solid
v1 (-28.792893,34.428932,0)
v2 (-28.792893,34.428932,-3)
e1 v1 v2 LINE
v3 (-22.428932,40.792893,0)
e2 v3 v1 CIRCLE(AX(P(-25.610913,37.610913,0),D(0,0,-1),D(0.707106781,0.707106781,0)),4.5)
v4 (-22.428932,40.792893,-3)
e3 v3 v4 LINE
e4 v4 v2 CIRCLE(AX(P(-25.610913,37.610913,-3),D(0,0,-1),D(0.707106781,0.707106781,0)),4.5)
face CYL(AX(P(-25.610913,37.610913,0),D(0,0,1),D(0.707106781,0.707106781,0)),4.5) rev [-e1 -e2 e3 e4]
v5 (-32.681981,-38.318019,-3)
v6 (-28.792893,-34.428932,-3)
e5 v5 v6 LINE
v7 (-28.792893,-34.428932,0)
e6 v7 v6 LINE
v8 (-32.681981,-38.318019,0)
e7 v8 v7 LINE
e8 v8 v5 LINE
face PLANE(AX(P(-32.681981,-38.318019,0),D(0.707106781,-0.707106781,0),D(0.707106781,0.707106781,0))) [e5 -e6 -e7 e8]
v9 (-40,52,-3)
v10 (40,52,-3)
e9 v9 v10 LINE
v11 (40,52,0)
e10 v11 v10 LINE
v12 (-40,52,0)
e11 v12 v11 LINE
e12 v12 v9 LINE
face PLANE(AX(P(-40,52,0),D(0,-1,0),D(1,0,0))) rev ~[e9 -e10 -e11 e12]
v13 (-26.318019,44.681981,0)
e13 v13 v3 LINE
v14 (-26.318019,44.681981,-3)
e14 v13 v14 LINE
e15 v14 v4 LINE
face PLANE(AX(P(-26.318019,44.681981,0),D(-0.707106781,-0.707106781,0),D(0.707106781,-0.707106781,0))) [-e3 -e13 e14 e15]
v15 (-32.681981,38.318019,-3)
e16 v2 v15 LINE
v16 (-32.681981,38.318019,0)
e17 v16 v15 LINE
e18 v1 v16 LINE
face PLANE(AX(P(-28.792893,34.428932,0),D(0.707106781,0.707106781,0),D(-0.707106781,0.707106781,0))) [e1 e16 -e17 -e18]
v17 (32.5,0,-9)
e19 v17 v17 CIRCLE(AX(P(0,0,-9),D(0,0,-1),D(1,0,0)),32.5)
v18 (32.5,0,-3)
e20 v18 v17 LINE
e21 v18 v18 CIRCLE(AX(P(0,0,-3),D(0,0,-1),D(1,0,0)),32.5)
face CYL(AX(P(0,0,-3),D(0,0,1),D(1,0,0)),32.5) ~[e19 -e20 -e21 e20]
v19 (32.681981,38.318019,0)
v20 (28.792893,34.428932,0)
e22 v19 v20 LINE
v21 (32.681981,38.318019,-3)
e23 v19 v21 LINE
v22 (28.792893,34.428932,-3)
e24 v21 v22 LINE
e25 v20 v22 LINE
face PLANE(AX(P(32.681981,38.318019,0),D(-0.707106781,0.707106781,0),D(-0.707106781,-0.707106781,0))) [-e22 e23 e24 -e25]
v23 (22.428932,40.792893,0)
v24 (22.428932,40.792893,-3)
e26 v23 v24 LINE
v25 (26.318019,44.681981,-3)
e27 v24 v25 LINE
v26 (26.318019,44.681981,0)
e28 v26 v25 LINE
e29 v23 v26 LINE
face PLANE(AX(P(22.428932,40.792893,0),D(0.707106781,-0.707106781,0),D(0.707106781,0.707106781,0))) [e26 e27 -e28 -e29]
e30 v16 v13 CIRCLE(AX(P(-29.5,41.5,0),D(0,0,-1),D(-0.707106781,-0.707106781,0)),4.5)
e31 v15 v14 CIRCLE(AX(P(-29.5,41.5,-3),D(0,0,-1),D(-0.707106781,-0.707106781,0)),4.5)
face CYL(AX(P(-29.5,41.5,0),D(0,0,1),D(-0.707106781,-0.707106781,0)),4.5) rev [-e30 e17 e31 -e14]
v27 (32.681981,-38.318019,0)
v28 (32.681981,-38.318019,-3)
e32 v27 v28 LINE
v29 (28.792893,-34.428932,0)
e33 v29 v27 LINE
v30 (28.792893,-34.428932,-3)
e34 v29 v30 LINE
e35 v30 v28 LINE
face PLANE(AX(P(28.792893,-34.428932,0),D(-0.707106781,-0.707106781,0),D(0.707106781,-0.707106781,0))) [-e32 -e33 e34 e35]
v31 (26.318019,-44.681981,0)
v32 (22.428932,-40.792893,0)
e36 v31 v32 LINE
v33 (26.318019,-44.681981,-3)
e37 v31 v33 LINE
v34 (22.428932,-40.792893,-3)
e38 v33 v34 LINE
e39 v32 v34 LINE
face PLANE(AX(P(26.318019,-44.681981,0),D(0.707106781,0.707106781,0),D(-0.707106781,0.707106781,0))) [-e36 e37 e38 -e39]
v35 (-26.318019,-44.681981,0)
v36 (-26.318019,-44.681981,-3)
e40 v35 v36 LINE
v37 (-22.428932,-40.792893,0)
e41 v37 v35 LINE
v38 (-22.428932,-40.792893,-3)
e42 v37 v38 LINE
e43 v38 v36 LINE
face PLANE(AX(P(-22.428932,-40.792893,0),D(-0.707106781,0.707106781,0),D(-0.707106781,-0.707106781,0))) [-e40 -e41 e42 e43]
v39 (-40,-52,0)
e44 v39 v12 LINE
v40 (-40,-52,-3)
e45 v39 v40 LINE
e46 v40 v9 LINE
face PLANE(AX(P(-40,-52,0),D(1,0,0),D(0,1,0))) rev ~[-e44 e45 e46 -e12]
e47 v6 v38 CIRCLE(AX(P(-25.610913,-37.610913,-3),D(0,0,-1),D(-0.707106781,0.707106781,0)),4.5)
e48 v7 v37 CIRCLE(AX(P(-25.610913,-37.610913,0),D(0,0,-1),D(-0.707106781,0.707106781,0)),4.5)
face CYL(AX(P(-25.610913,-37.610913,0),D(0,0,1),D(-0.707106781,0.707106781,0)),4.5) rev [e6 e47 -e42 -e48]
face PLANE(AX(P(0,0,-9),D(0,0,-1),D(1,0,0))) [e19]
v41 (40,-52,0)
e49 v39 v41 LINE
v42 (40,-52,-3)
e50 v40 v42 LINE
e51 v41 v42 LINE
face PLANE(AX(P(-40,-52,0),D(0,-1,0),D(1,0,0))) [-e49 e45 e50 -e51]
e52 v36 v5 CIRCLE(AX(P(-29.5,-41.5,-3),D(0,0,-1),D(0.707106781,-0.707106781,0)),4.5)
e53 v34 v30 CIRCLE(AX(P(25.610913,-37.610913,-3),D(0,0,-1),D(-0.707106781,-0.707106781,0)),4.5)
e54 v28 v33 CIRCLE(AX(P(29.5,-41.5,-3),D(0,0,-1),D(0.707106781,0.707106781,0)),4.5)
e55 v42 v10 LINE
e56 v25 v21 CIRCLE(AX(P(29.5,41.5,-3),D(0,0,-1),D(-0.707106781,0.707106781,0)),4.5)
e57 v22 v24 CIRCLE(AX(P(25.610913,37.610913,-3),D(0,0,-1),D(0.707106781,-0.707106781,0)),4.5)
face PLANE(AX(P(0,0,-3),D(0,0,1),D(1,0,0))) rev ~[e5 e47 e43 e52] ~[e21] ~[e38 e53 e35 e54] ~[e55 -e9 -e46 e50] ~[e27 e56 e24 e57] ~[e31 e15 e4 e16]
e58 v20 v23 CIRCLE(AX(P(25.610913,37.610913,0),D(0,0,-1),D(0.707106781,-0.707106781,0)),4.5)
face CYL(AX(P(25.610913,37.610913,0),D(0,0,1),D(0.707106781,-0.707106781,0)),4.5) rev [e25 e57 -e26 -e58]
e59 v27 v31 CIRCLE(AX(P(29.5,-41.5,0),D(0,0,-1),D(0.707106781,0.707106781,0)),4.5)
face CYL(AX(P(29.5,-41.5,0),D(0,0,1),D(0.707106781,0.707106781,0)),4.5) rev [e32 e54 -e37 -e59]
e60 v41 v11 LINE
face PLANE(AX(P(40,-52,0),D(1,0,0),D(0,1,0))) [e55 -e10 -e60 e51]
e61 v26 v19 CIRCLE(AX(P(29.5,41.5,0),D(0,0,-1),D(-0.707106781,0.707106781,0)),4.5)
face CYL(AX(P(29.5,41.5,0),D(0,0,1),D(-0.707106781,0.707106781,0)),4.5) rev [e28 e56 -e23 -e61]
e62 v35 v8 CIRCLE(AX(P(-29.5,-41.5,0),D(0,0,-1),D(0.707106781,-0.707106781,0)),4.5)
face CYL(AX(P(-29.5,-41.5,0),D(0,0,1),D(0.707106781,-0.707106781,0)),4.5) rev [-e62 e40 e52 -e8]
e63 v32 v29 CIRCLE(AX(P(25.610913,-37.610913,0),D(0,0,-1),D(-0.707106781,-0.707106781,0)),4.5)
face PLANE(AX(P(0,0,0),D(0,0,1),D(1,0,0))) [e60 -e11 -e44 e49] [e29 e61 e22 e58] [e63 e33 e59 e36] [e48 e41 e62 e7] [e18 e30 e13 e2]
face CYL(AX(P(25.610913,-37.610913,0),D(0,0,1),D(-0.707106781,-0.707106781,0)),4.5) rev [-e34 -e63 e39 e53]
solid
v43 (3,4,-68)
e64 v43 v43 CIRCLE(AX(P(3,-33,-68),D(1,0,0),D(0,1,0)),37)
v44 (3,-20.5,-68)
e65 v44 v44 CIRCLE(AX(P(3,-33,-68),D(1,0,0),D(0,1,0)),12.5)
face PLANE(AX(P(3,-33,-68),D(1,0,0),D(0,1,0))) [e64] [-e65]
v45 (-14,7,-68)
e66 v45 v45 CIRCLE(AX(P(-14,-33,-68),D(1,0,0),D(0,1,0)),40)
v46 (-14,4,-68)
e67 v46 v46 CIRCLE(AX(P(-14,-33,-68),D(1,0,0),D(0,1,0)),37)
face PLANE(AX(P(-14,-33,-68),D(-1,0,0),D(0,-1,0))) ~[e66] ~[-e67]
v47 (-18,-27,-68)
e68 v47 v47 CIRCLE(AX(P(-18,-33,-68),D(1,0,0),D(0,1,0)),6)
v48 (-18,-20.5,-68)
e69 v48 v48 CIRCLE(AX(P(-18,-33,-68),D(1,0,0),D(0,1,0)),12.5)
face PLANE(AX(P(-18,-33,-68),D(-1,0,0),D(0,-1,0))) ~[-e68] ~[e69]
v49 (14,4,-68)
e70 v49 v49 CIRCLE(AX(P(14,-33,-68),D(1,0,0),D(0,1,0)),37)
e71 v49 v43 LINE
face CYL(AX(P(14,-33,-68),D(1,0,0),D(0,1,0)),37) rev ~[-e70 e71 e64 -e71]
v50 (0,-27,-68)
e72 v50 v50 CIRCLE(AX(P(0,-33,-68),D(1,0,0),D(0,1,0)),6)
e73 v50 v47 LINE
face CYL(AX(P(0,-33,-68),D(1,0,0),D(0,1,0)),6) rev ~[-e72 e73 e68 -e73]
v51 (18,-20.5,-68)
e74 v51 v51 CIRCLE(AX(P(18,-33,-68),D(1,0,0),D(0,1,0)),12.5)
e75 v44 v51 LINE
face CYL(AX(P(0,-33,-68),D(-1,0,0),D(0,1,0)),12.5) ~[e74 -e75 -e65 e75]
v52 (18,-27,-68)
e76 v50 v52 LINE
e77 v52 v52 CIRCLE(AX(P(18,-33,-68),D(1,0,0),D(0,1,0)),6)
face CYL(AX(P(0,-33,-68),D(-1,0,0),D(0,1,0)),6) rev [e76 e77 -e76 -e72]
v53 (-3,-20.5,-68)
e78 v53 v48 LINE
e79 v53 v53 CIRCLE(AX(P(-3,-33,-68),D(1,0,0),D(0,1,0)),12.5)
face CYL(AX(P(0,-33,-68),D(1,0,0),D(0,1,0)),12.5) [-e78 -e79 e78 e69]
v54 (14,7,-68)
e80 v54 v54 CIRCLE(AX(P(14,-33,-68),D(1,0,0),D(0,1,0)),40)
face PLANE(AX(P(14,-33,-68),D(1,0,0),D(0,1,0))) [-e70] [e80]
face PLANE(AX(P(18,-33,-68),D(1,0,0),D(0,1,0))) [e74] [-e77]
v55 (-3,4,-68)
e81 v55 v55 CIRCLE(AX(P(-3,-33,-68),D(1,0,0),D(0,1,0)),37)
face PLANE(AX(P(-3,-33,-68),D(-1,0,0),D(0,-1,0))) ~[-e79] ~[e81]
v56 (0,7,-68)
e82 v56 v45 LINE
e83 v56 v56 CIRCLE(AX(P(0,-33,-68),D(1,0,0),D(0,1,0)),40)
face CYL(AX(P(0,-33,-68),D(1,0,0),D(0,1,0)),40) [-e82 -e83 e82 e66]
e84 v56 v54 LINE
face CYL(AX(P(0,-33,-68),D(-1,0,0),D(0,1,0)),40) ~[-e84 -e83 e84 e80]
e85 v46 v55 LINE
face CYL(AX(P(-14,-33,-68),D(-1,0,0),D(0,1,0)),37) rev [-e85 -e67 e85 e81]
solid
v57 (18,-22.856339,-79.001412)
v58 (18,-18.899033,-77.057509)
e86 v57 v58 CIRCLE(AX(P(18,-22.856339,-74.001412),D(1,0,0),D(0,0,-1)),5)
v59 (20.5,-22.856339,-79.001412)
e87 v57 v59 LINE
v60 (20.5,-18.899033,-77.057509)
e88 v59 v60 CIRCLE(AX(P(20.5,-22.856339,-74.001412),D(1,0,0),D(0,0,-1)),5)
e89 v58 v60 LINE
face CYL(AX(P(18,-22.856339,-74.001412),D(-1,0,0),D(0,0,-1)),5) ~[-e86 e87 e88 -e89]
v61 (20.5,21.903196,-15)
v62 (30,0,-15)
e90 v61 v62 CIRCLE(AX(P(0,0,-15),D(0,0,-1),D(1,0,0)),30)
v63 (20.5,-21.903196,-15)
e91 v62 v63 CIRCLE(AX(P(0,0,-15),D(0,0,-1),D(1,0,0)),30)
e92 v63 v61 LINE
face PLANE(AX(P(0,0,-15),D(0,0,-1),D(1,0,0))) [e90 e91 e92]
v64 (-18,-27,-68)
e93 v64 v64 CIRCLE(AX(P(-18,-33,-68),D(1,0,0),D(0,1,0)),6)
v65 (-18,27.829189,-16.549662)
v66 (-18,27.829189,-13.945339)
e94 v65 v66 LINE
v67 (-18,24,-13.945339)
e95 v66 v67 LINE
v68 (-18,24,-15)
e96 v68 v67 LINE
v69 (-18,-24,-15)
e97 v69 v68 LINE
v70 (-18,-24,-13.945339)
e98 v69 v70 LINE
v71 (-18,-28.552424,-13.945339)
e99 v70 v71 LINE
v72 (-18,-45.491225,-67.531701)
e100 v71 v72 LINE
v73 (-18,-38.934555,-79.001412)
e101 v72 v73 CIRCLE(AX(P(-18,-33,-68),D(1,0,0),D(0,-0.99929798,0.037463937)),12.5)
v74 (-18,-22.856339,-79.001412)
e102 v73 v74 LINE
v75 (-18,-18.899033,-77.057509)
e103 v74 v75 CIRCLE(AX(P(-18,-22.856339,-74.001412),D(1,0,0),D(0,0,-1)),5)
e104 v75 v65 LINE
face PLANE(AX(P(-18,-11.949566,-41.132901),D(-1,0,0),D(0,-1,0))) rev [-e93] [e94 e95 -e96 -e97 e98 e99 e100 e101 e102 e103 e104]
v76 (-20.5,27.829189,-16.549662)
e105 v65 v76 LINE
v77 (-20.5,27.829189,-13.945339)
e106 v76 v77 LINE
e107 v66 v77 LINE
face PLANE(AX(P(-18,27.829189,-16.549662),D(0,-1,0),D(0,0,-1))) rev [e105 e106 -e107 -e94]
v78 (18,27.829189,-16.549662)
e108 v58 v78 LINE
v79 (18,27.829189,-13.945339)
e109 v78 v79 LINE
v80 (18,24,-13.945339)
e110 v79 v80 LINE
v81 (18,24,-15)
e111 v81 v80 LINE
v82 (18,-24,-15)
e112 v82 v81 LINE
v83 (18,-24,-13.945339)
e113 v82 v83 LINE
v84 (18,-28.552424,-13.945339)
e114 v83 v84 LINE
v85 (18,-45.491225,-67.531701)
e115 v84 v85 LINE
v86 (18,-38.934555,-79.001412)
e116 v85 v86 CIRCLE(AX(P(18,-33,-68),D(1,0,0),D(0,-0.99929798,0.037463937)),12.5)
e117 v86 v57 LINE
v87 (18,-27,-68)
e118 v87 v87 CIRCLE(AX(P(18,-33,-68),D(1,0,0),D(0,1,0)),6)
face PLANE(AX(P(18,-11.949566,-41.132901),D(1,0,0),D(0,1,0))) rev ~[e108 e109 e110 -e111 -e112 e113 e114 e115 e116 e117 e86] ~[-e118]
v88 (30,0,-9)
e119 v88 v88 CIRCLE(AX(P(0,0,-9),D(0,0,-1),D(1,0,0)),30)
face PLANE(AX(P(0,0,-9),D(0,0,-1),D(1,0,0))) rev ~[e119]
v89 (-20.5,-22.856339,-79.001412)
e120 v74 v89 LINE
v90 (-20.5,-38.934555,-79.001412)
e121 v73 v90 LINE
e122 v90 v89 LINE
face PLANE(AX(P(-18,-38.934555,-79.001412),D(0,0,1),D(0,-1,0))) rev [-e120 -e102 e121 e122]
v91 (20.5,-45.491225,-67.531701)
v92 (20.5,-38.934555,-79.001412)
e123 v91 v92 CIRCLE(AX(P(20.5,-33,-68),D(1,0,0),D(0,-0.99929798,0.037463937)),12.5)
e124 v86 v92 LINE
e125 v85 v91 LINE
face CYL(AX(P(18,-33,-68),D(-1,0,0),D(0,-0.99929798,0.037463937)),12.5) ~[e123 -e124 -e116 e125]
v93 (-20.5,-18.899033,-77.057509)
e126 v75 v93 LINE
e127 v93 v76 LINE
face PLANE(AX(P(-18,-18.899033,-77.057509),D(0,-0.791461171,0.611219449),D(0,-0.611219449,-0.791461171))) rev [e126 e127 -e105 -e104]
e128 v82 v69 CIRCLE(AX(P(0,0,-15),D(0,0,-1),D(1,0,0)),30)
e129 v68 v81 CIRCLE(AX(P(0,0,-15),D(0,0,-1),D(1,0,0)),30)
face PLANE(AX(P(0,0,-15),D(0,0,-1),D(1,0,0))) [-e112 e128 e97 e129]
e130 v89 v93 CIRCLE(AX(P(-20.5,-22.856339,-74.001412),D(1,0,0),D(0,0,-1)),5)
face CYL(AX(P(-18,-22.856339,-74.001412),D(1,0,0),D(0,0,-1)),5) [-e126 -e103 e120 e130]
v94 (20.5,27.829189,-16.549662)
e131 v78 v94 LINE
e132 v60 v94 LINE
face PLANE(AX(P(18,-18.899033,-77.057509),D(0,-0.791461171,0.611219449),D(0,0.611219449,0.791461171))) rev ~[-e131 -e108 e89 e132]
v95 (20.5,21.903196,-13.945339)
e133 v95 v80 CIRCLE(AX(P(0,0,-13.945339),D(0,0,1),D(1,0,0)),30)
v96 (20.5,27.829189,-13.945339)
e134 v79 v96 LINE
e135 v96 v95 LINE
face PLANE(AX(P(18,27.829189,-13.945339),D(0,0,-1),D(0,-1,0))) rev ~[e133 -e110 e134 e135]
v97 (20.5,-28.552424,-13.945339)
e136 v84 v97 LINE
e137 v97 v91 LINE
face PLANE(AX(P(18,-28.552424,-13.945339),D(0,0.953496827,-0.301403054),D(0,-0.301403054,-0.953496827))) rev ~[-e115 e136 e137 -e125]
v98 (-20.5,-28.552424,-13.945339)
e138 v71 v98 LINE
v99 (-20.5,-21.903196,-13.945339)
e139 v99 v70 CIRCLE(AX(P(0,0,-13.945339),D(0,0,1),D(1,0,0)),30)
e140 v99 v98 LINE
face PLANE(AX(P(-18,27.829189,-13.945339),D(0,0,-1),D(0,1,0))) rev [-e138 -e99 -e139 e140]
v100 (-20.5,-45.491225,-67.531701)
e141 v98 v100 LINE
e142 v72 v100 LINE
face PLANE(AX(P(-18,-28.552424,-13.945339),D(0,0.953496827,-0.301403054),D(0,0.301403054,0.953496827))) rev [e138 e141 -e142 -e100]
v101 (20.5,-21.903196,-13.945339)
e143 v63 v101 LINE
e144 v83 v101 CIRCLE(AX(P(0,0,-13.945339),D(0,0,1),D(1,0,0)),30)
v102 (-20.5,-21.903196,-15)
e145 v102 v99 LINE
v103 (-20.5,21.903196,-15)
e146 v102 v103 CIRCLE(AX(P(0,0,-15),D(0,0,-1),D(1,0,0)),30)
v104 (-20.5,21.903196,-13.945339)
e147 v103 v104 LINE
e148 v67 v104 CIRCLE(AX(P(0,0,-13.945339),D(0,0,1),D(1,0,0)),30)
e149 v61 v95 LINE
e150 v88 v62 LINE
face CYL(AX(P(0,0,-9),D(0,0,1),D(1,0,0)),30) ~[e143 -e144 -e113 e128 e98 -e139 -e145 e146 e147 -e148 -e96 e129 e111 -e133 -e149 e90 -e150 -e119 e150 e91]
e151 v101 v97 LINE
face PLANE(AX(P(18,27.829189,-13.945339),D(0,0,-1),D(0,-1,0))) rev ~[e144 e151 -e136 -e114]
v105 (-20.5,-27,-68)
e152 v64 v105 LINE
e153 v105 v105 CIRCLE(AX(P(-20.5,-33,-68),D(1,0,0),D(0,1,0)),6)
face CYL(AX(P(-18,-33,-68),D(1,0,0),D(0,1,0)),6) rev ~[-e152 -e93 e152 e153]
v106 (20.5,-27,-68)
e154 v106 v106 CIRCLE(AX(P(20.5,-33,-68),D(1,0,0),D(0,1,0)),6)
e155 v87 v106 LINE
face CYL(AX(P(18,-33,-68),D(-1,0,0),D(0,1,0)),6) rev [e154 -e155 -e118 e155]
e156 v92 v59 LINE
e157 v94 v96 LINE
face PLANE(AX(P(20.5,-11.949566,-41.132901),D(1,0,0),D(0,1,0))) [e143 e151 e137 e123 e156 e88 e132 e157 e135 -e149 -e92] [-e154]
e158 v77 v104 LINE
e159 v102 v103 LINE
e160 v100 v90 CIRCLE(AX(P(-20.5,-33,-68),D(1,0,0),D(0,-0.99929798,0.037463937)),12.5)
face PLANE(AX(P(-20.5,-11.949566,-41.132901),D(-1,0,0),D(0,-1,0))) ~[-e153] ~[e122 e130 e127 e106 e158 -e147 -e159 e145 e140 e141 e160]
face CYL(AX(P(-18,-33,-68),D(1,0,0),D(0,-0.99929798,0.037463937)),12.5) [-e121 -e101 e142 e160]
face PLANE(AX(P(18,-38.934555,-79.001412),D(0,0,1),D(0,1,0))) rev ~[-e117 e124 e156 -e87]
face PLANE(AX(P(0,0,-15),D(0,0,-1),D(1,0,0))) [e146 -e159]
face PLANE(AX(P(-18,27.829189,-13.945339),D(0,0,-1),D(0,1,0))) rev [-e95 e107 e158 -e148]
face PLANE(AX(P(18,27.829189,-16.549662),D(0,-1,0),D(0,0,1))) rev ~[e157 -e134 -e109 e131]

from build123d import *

# Parameters (mm, degrees)
F1_W      = 80
F1_H      = 104
F2_DEPTH  = 3
F3_R      = 40
F3_R_2    = 12.5
F4_DEPTH  = 14
F5_R      = 37
F5_R_2    = 12.5
F6_DEPTH  = 11
F3_R_3    = 6
F7_DEPTH  = 18
F9_R      = 32.5
F10_DEPTH = 6
F11_R     = 6
F12_DEPTH = 2.5
F14_R     = 30
F15_DEPTH = 6


with BuildPart() as f2:
    # F1 (on Top) → F2 (new body)
    with BuildSketch(Plane.XY):
        Rectangle(F1_W, F1_H)
        with BuildLine():
            Line((-32.6819805153, -38.3180194847), (-28.7928932188, -34.4289321881))
            ThreePointArc((-28.7928932188, -34.4289321881), (-22.4289321881, -34.4289321881), (-22.4289321881, -40.7928932188))
            Line((-22.4289321881, -40.7928932188), (-26.3180194847, -44.6819805153))
            ThreePointArc((-26.3180194847, -44.6819805153), (-32.6819805153, -44.6819805153), (-32.6819805153, -38.3180194847))
        make_face(mode=Mode.SUBTRACT)
        with BuildLine():
            ThreePointArc((32.6819805153, -38.3180194847), (32.6819805153, -44.6819805153), (26.3180194847, -44.6819805153))
            Line((26.3180194847, -44.6819805153), (22.4289321881, -40.7928932188))
            ThreePointArc((22.4289321881, -40.7928932188), (22.4289321881, -34.4289321881), (28.7928932188, -34.4289321881))
            Line((28.7928932188, -34.4289321881), (32.6819805153, -38.3180194847))
        make_face(mode=Mode.SUBTRACT)
        with BuildLine():
            ThreePointArc((-32.6819805153, 38.3180194847), (-32.6819805153, 44.6819805153), (-26.3180194847, 44.6819805153))
            Line((-26.3180194847, 44.6819805153), (-22.4289321881, 40.7928932188))
            ThreePointArc((-22.4289321881, 40.7928932188), (-22.4289321881, 34.4289321881), (-28.7928932188, 34.4289321881))
            Line((-28.7928932188, 34.4289321881), (-32.6819805153, 38.3180194847))
        make_face(mode=Mode.SUBTRACT)
        with BuildLine():
            Line((32.6819805153, 38.3180194847), (28.7928932188, 34.4289321881))
            ThreePointArc((28.7928932188, 34.4289321881), (22.4289321881, 34.4289321881), (22.4289321881, 40.7928932188))
            Line((22.4289321881, 40.7928932188), (26.3180194847, 44.6819805153))
            ThreePointArc((26.3180194847, 44.6819805153), (32.6819805153, 44.6819805153), (32.6819805153, 38.3180194847))
        make_face(mode=Mode.SUBTRACT)
    extrude(amount=-F2_DEPTH)

    # F9 (on face) → F10 (join)
    with BuildSketch(Plane(origin=(0, 0, -3), x_dir=(1, 0, 0), z_dir=(0, 0, -1))):
        Circle(F9_R)
    extrude(amount=F10_DEPTH)


with BuildPart() as f4:
    # F3 (on Right) → F4 (new body)
    with BuildSketch(Plane.YZ):
        with Locations((-33, -68)):
            Circle(F3_R)
        with Locations((-33, -68)):
            Circle(F3_R_2, mode=Mode.SUBTRACT)
    extrude(amount=F4_DEPTH)

    # F5 (on face) → F6 (cut)
    with BuildSketch(Plane.YZ.offset(14)):
        with Locations((-33, -68)):
            Circle(F5_R)
        with Locations((-33, -68)):
            Circle(F5_R_2, mode=Mode.SUBTRACT)
    extrude(amount=-F6_DEPTH, mode=Mode.SUBTRACT)

    # F3 (on Right) → F7 (join)
    with BuildSketch(Plane.YZ):
        with Locations((-33, -68)):
            Circle(F3_R_2)
        with Locations((-33, -68)):
            Circle(F3_R_3, mode=Mode.SUBTRACT)
    extrude(amount=F7_DEPTH)

    # F8: F4 across plane


with BuildPart() as f4_1:
    add(f4.part)
    add(f4.part.mirror(Plane.YZ))


with BuildPart() as f12:
    # F11 (on face) → F12 (new body)
    with BuildSketch(Plane.YZ.offset(18)):
        with BuildLine():
            ThreePointArc((-20.5, -68), (-22.266129945, -74.4057812672), (-27.0654453829, -79.0014117956))
            Line((-27.0654453829, -79.0014117956), (-22.8563387324, -79.0014117956))
            ThreePointArc((-22.8563387324, -79.0014117956), (-20.651853104, -78.4892000163), (-18.899032878, -77.0575090412))
            Line((-18.899032878, -77.0575090412), (27.8291888535, -16.5496617556))
            Line((27.8291888535, -16.5496617556), (27.8291888535, -13.9453392476))
            Line((27.8291888535, -13.9453392476), (-28.5524237418, -13.9453392476))
            Line((-28.5524237418, -13.9453392476), (-43.4908901592, -61.2035874413))
            ThreePointArc((-43.4908901592, -61.2035874413), (-29.4564232046, -56.0127958433), (-20.5, -68))
        make_face()
        with BuildLine():
            ThreePointArc((-45.4912247538, -67.5317007898), (-43.8519999998, -74.2035551101), (-38.9345546171, -79.0014117956))
            Line((-38.9345546171, -79.0014117956), (-27.0654453829, -79.0014117956))
            ThreePointArc((-27.0654453829, -79.0014117956), (-22.266129945, -74.4057812672), (-20.5, -68))
            ThreePointArc((-20.5, -68), (-29.4564232046, -56.0127958433), (-43.4908901592, -61.2035874413))
            Line((-43.4908901592, -61.2035874413), (-45.4912247538, -67.5317007898))
        make_face()
        with Locations((-33, -68)):
            Circle(F11_R, mode=Mode.SUBTRACT)
    extrude(amount=F12_DEPTH)


with BuildPart() as f13_1:
    # F13: instance of F12
    add(f12.part.mirror(Plane.YZ))


with BuildPart() as f12_1:
    add(f12.part)

    add(f13_1.part)  # F15 merges F13_1
    # F14 (on face) → F15 (join)
    with BuildSketch(Plane(origin=(0, 0, -9), x_dir=(1, 0, 0), z_dir=(0, 0, -1))):
        Circle(F14_R)
    extrude(amount=F15_DEPTH)


solid = Compound([f2.part, f4_1.part, f12_1.part])
